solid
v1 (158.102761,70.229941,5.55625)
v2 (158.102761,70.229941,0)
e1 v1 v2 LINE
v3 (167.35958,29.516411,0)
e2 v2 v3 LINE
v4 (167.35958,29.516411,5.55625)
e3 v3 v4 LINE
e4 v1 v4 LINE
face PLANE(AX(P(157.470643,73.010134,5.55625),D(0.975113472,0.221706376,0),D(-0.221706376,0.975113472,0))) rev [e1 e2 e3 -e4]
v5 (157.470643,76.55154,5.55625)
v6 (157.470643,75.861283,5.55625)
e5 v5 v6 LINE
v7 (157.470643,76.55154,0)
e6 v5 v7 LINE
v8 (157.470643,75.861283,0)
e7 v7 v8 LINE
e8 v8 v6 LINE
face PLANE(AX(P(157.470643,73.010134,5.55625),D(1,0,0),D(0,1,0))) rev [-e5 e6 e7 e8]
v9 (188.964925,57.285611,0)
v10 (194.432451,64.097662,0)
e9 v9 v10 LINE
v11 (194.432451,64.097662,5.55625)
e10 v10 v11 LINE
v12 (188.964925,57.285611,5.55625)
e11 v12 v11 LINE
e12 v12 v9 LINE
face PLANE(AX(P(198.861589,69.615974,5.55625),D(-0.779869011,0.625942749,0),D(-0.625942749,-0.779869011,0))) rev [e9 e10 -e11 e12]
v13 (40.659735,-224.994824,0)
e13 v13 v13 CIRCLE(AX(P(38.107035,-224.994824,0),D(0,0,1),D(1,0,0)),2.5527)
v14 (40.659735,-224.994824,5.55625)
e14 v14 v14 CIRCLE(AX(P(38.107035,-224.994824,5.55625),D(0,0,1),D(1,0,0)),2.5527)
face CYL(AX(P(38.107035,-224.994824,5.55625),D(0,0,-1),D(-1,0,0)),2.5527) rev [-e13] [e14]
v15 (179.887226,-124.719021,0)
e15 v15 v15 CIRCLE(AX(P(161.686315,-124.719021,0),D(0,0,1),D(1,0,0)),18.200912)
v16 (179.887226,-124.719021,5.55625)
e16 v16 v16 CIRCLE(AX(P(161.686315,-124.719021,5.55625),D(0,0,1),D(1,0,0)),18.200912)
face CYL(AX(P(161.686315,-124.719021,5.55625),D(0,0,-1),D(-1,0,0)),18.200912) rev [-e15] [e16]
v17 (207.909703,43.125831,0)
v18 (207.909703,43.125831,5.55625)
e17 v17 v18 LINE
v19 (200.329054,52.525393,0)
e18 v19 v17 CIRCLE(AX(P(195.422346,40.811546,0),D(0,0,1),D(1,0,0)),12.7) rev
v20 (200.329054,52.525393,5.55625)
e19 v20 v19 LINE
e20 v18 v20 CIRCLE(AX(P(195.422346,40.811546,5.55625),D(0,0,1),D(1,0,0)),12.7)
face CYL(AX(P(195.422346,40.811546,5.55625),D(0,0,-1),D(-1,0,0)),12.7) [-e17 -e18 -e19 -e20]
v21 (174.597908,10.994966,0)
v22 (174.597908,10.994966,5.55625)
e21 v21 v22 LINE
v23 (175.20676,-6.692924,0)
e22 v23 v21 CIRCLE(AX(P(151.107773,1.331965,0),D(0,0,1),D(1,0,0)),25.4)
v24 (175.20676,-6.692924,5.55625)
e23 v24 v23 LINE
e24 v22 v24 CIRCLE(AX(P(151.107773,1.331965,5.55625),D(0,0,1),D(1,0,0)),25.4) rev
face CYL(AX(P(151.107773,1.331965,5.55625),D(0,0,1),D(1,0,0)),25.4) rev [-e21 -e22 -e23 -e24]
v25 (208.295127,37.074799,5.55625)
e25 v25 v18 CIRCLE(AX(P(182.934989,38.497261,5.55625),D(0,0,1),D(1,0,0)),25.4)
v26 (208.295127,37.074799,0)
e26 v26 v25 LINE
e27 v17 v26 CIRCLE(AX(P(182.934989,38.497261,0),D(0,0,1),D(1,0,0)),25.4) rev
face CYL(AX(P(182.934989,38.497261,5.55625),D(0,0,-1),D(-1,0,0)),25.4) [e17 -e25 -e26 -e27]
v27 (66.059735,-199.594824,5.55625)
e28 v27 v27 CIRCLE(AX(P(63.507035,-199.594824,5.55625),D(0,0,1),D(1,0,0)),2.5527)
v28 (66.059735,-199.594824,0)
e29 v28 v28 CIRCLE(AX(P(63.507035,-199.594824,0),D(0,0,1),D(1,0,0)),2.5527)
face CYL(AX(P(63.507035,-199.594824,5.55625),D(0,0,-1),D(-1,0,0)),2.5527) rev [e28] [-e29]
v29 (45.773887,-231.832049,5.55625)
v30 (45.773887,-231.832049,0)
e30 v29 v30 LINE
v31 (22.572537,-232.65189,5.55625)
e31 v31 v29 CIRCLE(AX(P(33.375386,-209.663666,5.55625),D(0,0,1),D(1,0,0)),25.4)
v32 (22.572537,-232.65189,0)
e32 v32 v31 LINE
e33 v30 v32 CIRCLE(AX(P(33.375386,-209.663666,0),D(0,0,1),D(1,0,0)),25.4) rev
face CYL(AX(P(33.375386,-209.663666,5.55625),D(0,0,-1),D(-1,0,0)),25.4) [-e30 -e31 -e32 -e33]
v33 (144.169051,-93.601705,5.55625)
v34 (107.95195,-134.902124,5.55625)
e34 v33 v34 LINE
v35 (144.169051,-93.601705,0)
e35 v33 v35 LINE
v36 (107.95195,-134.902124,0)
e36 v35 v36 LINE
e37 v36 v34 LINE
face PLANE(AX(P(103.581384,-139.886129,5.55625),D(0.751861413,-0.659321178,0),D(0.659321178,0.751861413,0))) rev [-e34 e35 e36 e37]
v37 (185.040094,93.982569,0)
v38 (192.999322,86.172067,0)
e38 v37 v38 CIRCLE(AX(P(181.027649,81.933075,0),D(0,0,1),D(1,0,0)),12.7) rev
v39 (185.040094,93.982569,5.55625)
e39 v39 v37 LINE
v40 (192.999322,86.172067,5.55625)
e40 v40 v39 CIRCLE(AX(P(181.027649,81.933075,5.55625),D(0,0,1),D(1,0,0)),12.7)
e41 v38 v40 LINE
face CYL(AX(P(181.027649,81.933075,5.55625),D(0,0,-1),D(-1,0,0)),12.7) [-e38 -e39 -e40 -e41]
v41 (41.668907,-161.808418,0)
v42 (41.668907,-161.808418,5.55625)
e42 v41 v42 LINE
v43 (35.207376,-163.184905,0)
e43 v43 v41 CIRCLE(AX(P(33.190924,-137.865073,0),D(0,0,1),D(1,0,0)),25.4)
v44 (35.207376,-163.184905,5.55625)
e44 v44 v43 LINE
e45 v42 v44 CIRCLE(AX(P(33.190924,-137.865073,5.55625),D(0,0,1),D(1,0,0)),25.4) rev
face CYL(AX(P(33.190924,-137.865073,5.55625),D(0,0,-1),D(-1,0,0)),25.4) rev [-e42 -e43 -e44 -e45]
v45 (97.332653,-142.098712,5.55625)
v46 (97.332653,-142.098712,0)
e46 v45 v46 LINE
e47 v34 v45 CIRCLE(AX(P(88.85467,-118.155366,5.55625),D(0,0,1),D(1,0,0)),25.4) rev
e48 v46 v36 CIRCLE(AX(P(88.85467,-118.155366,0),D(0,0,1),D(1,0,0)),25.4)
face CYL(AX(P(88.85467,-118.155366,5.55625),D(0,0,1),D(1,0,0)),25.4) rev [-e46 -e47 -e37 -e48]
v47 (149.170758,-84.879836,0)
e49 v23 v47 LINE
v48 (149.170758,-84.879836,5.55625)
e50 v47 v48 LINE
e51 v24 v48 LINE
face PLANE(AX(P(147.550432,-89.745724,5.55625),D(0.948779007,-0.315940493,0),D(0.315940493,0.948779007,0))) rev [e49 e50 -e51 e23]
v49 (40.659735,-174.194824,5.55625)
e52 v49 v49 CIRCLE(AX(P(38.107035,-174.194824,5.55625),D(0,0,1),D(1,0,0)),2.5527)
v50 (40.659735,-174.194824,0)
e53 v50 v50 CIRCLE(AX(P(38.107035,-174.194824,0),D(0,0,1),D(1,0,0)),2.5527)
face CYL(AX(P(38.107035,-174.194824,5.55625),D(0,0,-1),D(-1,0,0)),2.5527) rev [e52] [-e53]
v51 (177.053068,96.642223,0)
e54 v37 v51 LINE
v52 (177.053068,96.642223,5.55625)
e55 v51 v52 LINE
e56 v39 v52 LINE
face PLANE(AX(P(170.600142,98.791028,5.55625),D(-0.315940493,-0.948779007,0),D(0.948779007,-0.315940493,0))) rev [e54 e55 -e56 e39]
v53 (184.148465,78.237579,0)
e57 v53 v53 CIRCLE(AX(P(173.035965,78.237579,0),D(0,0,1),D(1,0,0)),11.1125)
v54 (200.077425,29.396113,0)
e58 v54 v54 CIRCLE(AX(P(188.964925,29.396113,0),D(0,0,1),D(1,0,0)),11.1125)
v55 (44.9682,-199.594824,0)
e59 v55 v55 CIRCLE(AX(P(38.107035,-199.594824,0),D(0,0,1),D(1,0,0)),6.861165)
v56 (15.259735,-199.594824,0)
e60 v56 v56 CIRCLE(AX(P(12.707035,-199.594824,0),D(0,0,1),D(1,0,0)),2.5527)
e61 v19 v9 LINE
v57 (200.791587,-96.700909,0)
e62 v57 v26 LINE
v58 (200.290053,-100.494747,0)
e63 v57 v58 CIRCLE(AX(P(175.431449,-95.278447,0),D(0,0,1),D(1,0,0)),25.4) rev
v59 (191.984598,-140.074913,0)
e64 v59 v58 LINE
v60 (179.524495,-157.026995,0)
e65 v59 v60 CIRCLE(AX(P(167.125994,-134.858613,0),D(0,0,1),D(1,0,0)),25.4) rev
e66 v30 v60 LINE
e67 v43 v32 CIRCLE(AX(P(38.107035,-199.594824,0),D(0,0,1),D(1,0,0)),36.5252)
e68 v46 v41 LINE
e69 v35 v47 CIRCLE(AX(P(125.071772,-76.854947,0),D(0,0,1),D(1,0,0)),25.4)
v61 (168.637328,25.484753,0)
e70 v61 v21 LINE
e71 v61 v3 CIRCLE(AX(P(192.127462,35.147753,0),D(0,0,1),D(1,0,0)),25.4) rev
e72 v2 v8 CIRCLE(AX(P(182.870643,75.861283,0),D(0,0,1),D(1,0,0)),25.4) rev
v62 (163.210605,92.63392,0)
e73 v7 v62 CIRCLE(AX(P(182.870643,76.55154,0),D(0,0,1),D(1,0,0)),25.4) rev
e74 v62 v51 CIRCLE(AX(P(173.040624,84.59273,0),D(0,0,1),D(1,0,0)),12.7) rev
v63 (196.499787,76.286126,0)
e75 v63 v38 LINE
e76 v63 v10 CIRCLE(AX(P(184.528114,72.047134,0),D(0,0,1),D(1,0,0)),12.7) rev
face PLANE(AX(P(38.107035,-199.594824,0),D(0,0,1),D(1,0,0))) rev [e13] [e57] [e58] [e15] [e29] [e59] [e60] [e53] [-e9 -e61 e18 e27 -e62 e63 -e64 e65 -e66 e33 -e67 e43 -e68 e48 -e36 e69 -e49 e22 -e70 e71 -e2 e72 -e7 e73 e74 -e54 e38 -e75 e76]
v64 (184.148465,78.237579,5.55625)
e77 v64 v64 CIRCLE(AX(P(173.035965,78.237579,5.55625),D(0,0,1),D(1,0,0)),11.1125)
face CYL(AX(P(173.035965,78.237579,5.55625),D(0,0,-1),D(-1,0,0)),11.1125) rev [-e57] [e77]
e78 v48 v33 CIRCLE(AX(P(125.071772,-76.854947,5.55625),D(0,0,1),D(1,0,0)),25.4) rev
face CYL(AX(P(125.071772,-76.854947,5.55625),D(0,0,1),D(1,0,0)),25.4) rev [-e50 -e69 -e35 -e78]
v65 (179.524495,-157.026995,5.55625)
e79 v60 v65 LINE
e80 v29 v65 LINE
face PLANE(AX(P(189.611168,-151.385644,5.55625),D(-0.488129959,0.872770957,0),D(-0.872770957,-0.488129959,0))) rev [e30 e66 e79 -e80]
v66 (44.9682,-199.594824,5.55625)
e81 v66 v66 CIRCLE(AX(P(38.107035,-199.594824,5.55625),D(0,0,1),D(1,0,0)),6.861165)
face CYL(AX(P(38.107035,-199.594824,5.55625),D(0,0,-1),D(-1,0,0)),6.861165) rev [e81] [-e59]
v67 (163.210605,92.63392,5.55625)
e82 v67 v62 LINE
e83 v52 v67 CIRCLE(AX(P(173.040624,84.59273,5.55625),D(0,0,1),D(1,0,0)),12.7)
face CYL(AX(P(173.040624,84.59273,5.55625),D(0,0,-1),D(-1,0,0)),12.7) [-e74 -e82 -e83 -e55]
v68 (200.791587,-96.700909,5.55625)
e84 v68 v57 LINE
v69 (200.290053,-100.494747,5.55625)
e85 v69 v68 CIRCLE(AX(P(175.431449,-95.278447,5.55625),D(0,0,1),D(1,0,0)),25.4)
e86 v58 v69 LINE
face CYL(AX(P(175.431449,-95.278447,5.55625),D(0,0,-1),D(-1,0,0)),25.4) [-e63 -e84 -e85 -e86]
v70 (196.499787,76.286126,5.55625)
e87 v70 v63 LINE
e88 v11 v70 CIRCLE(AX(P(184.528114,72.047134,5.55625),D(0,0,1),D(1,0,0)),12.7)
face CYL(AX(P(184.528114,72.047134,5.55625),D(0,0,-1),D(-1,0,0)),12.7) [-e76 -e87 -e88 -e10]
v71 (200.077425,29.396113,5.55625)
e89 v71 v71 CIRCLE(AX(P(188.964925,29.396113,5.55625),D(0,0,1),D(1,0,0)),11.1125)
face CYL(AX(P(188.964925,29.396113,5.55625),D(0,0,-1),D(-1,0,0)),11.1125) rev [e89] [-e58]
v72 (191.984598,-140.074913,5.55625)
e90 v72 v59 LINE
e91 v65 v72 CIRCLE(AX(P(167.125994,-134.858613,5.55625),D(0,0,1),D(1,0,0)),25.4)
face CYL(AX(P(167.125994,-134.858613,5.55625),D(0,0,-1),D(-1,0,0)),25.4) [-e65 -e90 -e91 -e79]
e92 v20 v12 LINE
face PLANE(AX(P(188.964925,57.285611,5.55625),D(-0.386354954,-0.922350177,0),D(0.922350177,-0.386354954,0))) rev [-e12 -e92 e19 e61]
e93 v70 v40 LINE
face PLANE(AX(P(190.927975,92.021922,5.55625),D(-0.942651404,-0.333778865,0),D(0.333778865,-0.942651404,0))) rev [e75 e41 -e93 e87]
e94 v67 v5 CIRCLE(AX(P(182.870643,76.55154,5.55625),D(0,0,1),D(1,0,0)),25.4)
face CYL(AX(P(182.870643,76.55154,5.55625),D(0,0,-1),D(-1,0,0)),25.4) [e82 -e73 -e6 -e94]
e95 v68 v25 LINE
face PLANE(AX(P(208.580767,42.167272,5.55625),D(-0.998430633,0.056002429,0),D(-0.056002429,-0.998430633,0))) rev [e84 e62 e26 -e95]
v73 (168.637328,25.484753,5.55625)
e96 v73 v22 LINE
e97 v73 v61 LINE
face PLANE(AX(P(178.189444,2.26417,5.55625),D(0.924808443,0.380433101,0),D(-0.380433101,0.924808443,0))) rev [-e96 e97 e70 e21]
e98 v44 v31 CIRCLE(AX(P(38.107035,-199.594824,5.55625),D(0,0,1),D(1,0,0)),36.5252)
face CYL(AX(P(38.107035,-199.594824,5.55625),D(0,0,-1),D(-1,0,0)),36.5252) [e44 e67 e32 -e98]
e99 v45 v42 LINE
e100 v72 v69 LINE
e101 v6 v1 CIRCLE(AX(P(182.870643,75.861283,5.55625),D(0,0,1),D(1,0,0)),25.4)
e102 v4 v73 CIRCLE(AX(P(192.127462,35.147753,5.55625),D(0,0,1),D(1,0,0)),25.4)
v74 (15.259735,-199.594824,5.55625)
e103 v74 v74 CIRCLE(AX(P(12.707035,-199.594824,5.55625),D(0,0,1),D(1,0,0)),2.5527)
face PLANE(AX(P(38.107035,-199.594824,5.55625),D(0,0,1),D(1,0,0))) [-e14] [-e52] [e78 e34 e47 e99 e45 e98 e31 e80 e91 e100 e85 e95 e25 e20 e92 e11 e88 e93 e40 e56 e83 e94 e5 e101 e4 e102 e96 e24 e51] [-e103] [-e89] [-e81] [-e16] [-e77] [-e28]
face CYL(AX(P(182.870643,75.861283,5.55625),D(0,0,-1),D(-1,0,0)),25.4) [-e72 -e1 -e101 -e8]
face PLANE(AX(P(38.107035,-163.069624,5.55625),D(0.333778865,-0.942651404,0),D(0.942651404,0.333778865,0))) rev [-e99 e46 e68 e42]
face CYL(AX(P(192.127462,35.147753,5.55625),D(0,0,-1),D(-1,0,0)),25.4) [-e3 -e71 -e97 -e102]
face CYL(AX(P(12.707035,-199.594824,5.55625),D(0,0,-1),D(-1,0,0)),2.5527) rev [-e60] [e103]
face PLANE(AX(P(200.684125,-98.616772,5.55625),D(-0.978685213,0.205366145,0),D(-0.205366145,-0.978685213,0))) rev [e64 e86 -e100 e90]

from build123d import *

# Parameters (mm, degrees)
SKETCH1_R           = 6.861165386
SKETCH1_R_2         = 18.200911839
SKETCH1_R_3         = 11.1125
SKETCH1_R_4         = 2.5527
BOSS_EXTRUDE1_DEPTH = 5.55625
FILLET1_R           = 25.4
FILLET3_R           = 12.7
FILLET4_R           = 12.7


with BuildPart() as part:
    # Sketch1 → Boss-Extrude1 (new body)
    with BuildSketch(Plane.XY):
        with BuildLine():
            Line((198.861588808, 69.615973931), (188.964925061, 57.285610842))
            Line((188.964925061, 57.285610842), (205.711419625, 50.270822653))
            Line((205.711419625, 50.270822653), (208.580766503, 42.167272229))
            Line((208.580766503, 42.167272229), (200.684125291, -98.616772294))
            Line((200.684125291, -98.616772294), (189.611167808, -151.385643895))
            Line((189.611167808, -151.385643895), (38.107034572, -236.120024372))
            ThreePointArc((38.107034572, -236.120024372), (1.581834572, -199.594824372), (38.107034572, -163.069624372))
            Line((38.107034572, -163.069624372), (103.581383992, -139.886129452))
            Line((103.581383992, -139.886129452), (147.550432491, -89.7457244))
            Line((147.550432491, -89.7457244), (171.836242771, -16.814689905))
            Line((171.836242771, -16.814689905), (178.189444477, 2.26417003))
            Line((178.189444477, 2.26417003), (167.830043749, 27.447208055))
            Line((167.830043749, 27.447208055), (157.470643022, 73.010133983))
            Line((157.470643022, 73.010133983), (157.470643022, 93.390021886))
            Line((157.470643022, 93.390021886), (170.600142232, 98.791028052))
            Line((170.600142232, 98.791028052), (190.927975242, 92.021922153))
            Line((190.927975242, 92.021922153), (198.861588808, 69.615973931))
        make_face()
        with Locations((38.107034572, -199.594824372)):
            Circle(SKETCH1_R, mode=Mode.SUBTRACT)
        with Locations((161.686314612, -124.719021489)):
            Circle(SKETCH1_R_2, mode=Mode.SUBTRACT)
        with Locations((188.964925061, 29.396113336)):
            Circle(SKETCH1_R_3, mode=Mode.SUBTRACT)
        with Locations((173.035965272, 78.237579188)):
            Circle(SKETCH1_R_3, mode=Mode.SUBTRACT)
        with Locations((38.107034572, -174.194824372)):
            Circle(SKETCH1_R_4, mode=Mode.SUBTRACT)
        with Locations((63.507034572, -199.594824372)):
            Circle(SKETCH1_R_4, mode=Mode.SUBTRACT)
        with Locations((38.107034572, -224.994824372)):
            Circle(SKETCH1_R_4, mode=Mode.SUBTRACT)
        with Locations((12.707034572, -199.594824372)):
            Circle(SKETCH1_R_4, mode=Mode.SUBTRACT)
    extrude(amount=BOSS_EXTRUDE1_DEPTH)

    # Fillet1
    # the kernel refuses this fillet: 25.4 mm, written as the material it adds along each edge
    with BuildSketch(Plane(origin=(178.189444477, 2.26417003, 0), x_dir=(-0.38043310119112933, 0.9248084426074947, 0), z_dir=(0, 0, 1))) as fillet1_piece_1:
        with BuildLine():
            CenterArc((FILLET1_R * 0.371679258358, FILLET1_R), FILLET1_R, 229.221887669, 40.778112331)
            Line((-FILLET1_R * 0.281452116845, FILLET1_R * 0.242755385146), (0, 0))
            Line((0, 0), (FILLET1_R * 0.371679258358, 0))
        make_face()
    extrude(amount=5.55625)
    with BuildSketch(Plane(origin=(147.550432491, -89.7457244, 0), x_dir=(0.315940492730092, 0.948779007489872, 0), z_dir=(0, 0, 1))) as fillet1_piece_2:
        with BuildLine():
            CenterArc((FILLET1_R * 0.201912574353, FILLET1_R), FILLET1_R, 247.169477311, 22.830522689)
            Line((-FILLET1_R * 0.186094053331, FILLET1_R * 0.0783434170618), (0, 0))
            Line((0, 0), (FILLET1_R * 0.201912574353, 0))
        make_face()
    extrude(amount=5.55625)
    with BuildSketch(Plane(origin=(103.581383992, -139.886129452, 0), x_dir=(-0.9426514039125685, -0.333778864971501, 0), z_dir=(0, 0, 1))) as fillet1_piece_3:
        with BuildLine():
            CenterArc((FILLET1_R * 0.26097983986, -FILLET1_R), FILLET1_R, 90, 29.253579042)
            Line((-FILLET1_R * 0.22769590207, -FILLET1_R * 0.127534516872), (0, 0))
            Line((0, 0), (FILLET1_R * 0.26097983986, 0))
        make_face()
    extrude(amount=5.55625)
    with BuildSketch(Plane(origin=(38.107034572, -163.069624372, 0), x_dir=(0.9426514039125696, 0.3337788649714982, 0), z_dir=(0, 0, 1))) as fillet1_piece_4:
        with BuildLine():
            CenterArc((3.778567788, 25.4), FILLET1_R, 255.05508403, 14.94491597)
            ThreePointArc((-2.771845496, 0.85917512), (-1.377386631, 0.457126529), (0, 0))
            Line((0, 0), (3.778567788, 0))
        make_face()
    extrude(amount=5.55625)
    # the kernel refuses this fillet: 25.4 mm, written as the material it takes off along each edge
    with BuildSketch(Plane(origin=(157.470643022, 93.390021886, -42.096203676), x_dir=(0, -1, 0), z_dir=(0, 0, 1))) as fillet1_2_piece_1:
        with BuildLine():
            CenterArc((16.83848147, 25.4), FILLET1_R, 208.887448124, 61.112551876)
            Line((-5.401006167, 13.12949921), (0, 0))
            Line((0, 0), (16.83848147, 0))
        make_face()
    extrude(amount=89.748657352, mode=Mode.SUBTRACT)
    with BuildSketch(Plane(origin=(157.470643022, 73.010133983, -7.12787144), x_dir=(0.22170637645104777, -0.9751134716744232, 0), z_dir=(0, 0, 1))) as fillet1_2_piece_2:
        with BuildLine():
            CenterArc((FILLET1_R * 0.11224994393, FILLET1_R), FILLET1_R, 257.190723516, 12.809276484)
            Line((-FILLET1_R * 0.109456432521, FILLET1_R * 0.0248865283256), (0, 0))
            Line((0, 0), (FILLET1_R * 0.11224994393, 0))
        make_face()
    extrude(amount=19.811992879, mode=Mode.SUBTRACT)
    with BuildSketch(Plane(origin=(167.830043749, 27.447208055, -5.305032246), x_dir=(0.3804331011911332, -0.9248084426074932, 0), z_dir=(0, 0, 1))) as fillet1_2_piece_3:
        with BuildLine():
            CenterArc((FILLET1_R * 0.0835438149047, FILLET1_R), FILLET1_R, 260.448763965, 9.551236035)
            Line((-FILLET1_R * 0.0823856984158, FILLET1_R * 0.0138623845481), (0, 0))
            Line((0, 0), (FILLET1_R * 0.0835438149047, 0))
        make_face()
    extrude(amount=16.166314493, mode=Mode.SUBTRACT)
    with BuildSketch(Plane(origin=(38.107034572, -236.120024372, -39.792317969), x_dir=(0.8727709569033328, 0.48812995891057614, 0), z_dir=(0, 0, 1))) as fillet1_2_piece_4:
        with BuildLine():
            CenterArc((8.784495846, 25.4), FILLET1_R, 215.61203078, 54.38796922)
            ThreePointArc((-11.865158329, 10.609740285), (-6.517544718, 4.650687408), (0, 0))
            Line((0, 0), (8.784495846, 0))
        make_face()
    extrude(amount=85.140885938, mode=Mode.SUBTRACT)
    with BuildSketch(Plane(origin=(189.611167808, -151.385643895, -28.892669195), x_dir=(0.20536614533433253, 0.9786852131050707, 0), z_dir=(0, 0, 1))) as fillet1_2_piece_5:
        with BuildLine():
            CenterArc((FILLET1_R * 0.455002664481, FILLET1_R), FILLET1_R, 221.068676821, 48.931323179)
            Line((-FILLET1_R * 0.298919997384, FILLET1_R * 0.343036819962), (0, 0))
            Line((0, 0), (FILLET1_R * 0.455002664481, 0))
        make_face()
    extrude(amount=63.341588389, mode=Mode.SUBTRACT)
    with BuildSketch(Plane(origin=(200.684125291, -98.616772294, -4.797187782), x_dir=(0.056002429151398234, 0.9984306325074078, 0), z_dir=(0, 0, 1))) as fillet1_2_piece_6:
        with BuildLine():
            CenterArc((FILLET1_R * 0.075546264279, FILLET1_R), FILLET1_R, 261.359448749, 8.640551251)
            Line((-FILLET1_R * 0.0746888367943, FILLET1_R * 0.0113497006497), (0, 0))
            Line((0, 0), (FILLET1_R * 0.075546264279, 0))
        make_face()
    extrude(amount=15.150625563, mode=Mode.SUBTRACT)
    with BuildSketch(Plane(origin=(208.580766503, 42.167272229, -12.751193258), x_dir=(-0.33377886497150366, 0.9426514039125676, 0), z_dir=(0, 0, 1))) as fillet1_2_piece_7:
        with BuildLine():
            CenterArc((FILLET1_R * 0.200806193046, FILLET1_R), FILLET1_R, 247.291319111, 22.708680889)
            Line((-FILLET1_R * 0.185239618687, FILLET1_R * 0.0775203897954), (0, 0))
            Line((0, 0), (FILLET1_R * 0.200806193046, 0))
        make_face()
    extrude(amount=31.058636517, mode=Mode.SUBTRACT)

    # Fillet3
    fillet3_edges = [part.edges().sort_by_distance(p)[0] for p in [
        (170.600142232, 98.791028052, 2.778125),
        (190.927975242, 92.021922153, 2.778125),
    ]]
    fillet(fillet3_edges, radius=FILLET3_R)

    # Fillet4
    fillet4_edges = [part.edges().sort_by_distance(p)[0] for p in [
        (205.711419625, 50.270822653, 2.778125),
        (198.861588808, 69.615973931, 2.778125),
    ]]
    fillet(fillet4_edges, radius=FILLET4_R)


solid = part.part
